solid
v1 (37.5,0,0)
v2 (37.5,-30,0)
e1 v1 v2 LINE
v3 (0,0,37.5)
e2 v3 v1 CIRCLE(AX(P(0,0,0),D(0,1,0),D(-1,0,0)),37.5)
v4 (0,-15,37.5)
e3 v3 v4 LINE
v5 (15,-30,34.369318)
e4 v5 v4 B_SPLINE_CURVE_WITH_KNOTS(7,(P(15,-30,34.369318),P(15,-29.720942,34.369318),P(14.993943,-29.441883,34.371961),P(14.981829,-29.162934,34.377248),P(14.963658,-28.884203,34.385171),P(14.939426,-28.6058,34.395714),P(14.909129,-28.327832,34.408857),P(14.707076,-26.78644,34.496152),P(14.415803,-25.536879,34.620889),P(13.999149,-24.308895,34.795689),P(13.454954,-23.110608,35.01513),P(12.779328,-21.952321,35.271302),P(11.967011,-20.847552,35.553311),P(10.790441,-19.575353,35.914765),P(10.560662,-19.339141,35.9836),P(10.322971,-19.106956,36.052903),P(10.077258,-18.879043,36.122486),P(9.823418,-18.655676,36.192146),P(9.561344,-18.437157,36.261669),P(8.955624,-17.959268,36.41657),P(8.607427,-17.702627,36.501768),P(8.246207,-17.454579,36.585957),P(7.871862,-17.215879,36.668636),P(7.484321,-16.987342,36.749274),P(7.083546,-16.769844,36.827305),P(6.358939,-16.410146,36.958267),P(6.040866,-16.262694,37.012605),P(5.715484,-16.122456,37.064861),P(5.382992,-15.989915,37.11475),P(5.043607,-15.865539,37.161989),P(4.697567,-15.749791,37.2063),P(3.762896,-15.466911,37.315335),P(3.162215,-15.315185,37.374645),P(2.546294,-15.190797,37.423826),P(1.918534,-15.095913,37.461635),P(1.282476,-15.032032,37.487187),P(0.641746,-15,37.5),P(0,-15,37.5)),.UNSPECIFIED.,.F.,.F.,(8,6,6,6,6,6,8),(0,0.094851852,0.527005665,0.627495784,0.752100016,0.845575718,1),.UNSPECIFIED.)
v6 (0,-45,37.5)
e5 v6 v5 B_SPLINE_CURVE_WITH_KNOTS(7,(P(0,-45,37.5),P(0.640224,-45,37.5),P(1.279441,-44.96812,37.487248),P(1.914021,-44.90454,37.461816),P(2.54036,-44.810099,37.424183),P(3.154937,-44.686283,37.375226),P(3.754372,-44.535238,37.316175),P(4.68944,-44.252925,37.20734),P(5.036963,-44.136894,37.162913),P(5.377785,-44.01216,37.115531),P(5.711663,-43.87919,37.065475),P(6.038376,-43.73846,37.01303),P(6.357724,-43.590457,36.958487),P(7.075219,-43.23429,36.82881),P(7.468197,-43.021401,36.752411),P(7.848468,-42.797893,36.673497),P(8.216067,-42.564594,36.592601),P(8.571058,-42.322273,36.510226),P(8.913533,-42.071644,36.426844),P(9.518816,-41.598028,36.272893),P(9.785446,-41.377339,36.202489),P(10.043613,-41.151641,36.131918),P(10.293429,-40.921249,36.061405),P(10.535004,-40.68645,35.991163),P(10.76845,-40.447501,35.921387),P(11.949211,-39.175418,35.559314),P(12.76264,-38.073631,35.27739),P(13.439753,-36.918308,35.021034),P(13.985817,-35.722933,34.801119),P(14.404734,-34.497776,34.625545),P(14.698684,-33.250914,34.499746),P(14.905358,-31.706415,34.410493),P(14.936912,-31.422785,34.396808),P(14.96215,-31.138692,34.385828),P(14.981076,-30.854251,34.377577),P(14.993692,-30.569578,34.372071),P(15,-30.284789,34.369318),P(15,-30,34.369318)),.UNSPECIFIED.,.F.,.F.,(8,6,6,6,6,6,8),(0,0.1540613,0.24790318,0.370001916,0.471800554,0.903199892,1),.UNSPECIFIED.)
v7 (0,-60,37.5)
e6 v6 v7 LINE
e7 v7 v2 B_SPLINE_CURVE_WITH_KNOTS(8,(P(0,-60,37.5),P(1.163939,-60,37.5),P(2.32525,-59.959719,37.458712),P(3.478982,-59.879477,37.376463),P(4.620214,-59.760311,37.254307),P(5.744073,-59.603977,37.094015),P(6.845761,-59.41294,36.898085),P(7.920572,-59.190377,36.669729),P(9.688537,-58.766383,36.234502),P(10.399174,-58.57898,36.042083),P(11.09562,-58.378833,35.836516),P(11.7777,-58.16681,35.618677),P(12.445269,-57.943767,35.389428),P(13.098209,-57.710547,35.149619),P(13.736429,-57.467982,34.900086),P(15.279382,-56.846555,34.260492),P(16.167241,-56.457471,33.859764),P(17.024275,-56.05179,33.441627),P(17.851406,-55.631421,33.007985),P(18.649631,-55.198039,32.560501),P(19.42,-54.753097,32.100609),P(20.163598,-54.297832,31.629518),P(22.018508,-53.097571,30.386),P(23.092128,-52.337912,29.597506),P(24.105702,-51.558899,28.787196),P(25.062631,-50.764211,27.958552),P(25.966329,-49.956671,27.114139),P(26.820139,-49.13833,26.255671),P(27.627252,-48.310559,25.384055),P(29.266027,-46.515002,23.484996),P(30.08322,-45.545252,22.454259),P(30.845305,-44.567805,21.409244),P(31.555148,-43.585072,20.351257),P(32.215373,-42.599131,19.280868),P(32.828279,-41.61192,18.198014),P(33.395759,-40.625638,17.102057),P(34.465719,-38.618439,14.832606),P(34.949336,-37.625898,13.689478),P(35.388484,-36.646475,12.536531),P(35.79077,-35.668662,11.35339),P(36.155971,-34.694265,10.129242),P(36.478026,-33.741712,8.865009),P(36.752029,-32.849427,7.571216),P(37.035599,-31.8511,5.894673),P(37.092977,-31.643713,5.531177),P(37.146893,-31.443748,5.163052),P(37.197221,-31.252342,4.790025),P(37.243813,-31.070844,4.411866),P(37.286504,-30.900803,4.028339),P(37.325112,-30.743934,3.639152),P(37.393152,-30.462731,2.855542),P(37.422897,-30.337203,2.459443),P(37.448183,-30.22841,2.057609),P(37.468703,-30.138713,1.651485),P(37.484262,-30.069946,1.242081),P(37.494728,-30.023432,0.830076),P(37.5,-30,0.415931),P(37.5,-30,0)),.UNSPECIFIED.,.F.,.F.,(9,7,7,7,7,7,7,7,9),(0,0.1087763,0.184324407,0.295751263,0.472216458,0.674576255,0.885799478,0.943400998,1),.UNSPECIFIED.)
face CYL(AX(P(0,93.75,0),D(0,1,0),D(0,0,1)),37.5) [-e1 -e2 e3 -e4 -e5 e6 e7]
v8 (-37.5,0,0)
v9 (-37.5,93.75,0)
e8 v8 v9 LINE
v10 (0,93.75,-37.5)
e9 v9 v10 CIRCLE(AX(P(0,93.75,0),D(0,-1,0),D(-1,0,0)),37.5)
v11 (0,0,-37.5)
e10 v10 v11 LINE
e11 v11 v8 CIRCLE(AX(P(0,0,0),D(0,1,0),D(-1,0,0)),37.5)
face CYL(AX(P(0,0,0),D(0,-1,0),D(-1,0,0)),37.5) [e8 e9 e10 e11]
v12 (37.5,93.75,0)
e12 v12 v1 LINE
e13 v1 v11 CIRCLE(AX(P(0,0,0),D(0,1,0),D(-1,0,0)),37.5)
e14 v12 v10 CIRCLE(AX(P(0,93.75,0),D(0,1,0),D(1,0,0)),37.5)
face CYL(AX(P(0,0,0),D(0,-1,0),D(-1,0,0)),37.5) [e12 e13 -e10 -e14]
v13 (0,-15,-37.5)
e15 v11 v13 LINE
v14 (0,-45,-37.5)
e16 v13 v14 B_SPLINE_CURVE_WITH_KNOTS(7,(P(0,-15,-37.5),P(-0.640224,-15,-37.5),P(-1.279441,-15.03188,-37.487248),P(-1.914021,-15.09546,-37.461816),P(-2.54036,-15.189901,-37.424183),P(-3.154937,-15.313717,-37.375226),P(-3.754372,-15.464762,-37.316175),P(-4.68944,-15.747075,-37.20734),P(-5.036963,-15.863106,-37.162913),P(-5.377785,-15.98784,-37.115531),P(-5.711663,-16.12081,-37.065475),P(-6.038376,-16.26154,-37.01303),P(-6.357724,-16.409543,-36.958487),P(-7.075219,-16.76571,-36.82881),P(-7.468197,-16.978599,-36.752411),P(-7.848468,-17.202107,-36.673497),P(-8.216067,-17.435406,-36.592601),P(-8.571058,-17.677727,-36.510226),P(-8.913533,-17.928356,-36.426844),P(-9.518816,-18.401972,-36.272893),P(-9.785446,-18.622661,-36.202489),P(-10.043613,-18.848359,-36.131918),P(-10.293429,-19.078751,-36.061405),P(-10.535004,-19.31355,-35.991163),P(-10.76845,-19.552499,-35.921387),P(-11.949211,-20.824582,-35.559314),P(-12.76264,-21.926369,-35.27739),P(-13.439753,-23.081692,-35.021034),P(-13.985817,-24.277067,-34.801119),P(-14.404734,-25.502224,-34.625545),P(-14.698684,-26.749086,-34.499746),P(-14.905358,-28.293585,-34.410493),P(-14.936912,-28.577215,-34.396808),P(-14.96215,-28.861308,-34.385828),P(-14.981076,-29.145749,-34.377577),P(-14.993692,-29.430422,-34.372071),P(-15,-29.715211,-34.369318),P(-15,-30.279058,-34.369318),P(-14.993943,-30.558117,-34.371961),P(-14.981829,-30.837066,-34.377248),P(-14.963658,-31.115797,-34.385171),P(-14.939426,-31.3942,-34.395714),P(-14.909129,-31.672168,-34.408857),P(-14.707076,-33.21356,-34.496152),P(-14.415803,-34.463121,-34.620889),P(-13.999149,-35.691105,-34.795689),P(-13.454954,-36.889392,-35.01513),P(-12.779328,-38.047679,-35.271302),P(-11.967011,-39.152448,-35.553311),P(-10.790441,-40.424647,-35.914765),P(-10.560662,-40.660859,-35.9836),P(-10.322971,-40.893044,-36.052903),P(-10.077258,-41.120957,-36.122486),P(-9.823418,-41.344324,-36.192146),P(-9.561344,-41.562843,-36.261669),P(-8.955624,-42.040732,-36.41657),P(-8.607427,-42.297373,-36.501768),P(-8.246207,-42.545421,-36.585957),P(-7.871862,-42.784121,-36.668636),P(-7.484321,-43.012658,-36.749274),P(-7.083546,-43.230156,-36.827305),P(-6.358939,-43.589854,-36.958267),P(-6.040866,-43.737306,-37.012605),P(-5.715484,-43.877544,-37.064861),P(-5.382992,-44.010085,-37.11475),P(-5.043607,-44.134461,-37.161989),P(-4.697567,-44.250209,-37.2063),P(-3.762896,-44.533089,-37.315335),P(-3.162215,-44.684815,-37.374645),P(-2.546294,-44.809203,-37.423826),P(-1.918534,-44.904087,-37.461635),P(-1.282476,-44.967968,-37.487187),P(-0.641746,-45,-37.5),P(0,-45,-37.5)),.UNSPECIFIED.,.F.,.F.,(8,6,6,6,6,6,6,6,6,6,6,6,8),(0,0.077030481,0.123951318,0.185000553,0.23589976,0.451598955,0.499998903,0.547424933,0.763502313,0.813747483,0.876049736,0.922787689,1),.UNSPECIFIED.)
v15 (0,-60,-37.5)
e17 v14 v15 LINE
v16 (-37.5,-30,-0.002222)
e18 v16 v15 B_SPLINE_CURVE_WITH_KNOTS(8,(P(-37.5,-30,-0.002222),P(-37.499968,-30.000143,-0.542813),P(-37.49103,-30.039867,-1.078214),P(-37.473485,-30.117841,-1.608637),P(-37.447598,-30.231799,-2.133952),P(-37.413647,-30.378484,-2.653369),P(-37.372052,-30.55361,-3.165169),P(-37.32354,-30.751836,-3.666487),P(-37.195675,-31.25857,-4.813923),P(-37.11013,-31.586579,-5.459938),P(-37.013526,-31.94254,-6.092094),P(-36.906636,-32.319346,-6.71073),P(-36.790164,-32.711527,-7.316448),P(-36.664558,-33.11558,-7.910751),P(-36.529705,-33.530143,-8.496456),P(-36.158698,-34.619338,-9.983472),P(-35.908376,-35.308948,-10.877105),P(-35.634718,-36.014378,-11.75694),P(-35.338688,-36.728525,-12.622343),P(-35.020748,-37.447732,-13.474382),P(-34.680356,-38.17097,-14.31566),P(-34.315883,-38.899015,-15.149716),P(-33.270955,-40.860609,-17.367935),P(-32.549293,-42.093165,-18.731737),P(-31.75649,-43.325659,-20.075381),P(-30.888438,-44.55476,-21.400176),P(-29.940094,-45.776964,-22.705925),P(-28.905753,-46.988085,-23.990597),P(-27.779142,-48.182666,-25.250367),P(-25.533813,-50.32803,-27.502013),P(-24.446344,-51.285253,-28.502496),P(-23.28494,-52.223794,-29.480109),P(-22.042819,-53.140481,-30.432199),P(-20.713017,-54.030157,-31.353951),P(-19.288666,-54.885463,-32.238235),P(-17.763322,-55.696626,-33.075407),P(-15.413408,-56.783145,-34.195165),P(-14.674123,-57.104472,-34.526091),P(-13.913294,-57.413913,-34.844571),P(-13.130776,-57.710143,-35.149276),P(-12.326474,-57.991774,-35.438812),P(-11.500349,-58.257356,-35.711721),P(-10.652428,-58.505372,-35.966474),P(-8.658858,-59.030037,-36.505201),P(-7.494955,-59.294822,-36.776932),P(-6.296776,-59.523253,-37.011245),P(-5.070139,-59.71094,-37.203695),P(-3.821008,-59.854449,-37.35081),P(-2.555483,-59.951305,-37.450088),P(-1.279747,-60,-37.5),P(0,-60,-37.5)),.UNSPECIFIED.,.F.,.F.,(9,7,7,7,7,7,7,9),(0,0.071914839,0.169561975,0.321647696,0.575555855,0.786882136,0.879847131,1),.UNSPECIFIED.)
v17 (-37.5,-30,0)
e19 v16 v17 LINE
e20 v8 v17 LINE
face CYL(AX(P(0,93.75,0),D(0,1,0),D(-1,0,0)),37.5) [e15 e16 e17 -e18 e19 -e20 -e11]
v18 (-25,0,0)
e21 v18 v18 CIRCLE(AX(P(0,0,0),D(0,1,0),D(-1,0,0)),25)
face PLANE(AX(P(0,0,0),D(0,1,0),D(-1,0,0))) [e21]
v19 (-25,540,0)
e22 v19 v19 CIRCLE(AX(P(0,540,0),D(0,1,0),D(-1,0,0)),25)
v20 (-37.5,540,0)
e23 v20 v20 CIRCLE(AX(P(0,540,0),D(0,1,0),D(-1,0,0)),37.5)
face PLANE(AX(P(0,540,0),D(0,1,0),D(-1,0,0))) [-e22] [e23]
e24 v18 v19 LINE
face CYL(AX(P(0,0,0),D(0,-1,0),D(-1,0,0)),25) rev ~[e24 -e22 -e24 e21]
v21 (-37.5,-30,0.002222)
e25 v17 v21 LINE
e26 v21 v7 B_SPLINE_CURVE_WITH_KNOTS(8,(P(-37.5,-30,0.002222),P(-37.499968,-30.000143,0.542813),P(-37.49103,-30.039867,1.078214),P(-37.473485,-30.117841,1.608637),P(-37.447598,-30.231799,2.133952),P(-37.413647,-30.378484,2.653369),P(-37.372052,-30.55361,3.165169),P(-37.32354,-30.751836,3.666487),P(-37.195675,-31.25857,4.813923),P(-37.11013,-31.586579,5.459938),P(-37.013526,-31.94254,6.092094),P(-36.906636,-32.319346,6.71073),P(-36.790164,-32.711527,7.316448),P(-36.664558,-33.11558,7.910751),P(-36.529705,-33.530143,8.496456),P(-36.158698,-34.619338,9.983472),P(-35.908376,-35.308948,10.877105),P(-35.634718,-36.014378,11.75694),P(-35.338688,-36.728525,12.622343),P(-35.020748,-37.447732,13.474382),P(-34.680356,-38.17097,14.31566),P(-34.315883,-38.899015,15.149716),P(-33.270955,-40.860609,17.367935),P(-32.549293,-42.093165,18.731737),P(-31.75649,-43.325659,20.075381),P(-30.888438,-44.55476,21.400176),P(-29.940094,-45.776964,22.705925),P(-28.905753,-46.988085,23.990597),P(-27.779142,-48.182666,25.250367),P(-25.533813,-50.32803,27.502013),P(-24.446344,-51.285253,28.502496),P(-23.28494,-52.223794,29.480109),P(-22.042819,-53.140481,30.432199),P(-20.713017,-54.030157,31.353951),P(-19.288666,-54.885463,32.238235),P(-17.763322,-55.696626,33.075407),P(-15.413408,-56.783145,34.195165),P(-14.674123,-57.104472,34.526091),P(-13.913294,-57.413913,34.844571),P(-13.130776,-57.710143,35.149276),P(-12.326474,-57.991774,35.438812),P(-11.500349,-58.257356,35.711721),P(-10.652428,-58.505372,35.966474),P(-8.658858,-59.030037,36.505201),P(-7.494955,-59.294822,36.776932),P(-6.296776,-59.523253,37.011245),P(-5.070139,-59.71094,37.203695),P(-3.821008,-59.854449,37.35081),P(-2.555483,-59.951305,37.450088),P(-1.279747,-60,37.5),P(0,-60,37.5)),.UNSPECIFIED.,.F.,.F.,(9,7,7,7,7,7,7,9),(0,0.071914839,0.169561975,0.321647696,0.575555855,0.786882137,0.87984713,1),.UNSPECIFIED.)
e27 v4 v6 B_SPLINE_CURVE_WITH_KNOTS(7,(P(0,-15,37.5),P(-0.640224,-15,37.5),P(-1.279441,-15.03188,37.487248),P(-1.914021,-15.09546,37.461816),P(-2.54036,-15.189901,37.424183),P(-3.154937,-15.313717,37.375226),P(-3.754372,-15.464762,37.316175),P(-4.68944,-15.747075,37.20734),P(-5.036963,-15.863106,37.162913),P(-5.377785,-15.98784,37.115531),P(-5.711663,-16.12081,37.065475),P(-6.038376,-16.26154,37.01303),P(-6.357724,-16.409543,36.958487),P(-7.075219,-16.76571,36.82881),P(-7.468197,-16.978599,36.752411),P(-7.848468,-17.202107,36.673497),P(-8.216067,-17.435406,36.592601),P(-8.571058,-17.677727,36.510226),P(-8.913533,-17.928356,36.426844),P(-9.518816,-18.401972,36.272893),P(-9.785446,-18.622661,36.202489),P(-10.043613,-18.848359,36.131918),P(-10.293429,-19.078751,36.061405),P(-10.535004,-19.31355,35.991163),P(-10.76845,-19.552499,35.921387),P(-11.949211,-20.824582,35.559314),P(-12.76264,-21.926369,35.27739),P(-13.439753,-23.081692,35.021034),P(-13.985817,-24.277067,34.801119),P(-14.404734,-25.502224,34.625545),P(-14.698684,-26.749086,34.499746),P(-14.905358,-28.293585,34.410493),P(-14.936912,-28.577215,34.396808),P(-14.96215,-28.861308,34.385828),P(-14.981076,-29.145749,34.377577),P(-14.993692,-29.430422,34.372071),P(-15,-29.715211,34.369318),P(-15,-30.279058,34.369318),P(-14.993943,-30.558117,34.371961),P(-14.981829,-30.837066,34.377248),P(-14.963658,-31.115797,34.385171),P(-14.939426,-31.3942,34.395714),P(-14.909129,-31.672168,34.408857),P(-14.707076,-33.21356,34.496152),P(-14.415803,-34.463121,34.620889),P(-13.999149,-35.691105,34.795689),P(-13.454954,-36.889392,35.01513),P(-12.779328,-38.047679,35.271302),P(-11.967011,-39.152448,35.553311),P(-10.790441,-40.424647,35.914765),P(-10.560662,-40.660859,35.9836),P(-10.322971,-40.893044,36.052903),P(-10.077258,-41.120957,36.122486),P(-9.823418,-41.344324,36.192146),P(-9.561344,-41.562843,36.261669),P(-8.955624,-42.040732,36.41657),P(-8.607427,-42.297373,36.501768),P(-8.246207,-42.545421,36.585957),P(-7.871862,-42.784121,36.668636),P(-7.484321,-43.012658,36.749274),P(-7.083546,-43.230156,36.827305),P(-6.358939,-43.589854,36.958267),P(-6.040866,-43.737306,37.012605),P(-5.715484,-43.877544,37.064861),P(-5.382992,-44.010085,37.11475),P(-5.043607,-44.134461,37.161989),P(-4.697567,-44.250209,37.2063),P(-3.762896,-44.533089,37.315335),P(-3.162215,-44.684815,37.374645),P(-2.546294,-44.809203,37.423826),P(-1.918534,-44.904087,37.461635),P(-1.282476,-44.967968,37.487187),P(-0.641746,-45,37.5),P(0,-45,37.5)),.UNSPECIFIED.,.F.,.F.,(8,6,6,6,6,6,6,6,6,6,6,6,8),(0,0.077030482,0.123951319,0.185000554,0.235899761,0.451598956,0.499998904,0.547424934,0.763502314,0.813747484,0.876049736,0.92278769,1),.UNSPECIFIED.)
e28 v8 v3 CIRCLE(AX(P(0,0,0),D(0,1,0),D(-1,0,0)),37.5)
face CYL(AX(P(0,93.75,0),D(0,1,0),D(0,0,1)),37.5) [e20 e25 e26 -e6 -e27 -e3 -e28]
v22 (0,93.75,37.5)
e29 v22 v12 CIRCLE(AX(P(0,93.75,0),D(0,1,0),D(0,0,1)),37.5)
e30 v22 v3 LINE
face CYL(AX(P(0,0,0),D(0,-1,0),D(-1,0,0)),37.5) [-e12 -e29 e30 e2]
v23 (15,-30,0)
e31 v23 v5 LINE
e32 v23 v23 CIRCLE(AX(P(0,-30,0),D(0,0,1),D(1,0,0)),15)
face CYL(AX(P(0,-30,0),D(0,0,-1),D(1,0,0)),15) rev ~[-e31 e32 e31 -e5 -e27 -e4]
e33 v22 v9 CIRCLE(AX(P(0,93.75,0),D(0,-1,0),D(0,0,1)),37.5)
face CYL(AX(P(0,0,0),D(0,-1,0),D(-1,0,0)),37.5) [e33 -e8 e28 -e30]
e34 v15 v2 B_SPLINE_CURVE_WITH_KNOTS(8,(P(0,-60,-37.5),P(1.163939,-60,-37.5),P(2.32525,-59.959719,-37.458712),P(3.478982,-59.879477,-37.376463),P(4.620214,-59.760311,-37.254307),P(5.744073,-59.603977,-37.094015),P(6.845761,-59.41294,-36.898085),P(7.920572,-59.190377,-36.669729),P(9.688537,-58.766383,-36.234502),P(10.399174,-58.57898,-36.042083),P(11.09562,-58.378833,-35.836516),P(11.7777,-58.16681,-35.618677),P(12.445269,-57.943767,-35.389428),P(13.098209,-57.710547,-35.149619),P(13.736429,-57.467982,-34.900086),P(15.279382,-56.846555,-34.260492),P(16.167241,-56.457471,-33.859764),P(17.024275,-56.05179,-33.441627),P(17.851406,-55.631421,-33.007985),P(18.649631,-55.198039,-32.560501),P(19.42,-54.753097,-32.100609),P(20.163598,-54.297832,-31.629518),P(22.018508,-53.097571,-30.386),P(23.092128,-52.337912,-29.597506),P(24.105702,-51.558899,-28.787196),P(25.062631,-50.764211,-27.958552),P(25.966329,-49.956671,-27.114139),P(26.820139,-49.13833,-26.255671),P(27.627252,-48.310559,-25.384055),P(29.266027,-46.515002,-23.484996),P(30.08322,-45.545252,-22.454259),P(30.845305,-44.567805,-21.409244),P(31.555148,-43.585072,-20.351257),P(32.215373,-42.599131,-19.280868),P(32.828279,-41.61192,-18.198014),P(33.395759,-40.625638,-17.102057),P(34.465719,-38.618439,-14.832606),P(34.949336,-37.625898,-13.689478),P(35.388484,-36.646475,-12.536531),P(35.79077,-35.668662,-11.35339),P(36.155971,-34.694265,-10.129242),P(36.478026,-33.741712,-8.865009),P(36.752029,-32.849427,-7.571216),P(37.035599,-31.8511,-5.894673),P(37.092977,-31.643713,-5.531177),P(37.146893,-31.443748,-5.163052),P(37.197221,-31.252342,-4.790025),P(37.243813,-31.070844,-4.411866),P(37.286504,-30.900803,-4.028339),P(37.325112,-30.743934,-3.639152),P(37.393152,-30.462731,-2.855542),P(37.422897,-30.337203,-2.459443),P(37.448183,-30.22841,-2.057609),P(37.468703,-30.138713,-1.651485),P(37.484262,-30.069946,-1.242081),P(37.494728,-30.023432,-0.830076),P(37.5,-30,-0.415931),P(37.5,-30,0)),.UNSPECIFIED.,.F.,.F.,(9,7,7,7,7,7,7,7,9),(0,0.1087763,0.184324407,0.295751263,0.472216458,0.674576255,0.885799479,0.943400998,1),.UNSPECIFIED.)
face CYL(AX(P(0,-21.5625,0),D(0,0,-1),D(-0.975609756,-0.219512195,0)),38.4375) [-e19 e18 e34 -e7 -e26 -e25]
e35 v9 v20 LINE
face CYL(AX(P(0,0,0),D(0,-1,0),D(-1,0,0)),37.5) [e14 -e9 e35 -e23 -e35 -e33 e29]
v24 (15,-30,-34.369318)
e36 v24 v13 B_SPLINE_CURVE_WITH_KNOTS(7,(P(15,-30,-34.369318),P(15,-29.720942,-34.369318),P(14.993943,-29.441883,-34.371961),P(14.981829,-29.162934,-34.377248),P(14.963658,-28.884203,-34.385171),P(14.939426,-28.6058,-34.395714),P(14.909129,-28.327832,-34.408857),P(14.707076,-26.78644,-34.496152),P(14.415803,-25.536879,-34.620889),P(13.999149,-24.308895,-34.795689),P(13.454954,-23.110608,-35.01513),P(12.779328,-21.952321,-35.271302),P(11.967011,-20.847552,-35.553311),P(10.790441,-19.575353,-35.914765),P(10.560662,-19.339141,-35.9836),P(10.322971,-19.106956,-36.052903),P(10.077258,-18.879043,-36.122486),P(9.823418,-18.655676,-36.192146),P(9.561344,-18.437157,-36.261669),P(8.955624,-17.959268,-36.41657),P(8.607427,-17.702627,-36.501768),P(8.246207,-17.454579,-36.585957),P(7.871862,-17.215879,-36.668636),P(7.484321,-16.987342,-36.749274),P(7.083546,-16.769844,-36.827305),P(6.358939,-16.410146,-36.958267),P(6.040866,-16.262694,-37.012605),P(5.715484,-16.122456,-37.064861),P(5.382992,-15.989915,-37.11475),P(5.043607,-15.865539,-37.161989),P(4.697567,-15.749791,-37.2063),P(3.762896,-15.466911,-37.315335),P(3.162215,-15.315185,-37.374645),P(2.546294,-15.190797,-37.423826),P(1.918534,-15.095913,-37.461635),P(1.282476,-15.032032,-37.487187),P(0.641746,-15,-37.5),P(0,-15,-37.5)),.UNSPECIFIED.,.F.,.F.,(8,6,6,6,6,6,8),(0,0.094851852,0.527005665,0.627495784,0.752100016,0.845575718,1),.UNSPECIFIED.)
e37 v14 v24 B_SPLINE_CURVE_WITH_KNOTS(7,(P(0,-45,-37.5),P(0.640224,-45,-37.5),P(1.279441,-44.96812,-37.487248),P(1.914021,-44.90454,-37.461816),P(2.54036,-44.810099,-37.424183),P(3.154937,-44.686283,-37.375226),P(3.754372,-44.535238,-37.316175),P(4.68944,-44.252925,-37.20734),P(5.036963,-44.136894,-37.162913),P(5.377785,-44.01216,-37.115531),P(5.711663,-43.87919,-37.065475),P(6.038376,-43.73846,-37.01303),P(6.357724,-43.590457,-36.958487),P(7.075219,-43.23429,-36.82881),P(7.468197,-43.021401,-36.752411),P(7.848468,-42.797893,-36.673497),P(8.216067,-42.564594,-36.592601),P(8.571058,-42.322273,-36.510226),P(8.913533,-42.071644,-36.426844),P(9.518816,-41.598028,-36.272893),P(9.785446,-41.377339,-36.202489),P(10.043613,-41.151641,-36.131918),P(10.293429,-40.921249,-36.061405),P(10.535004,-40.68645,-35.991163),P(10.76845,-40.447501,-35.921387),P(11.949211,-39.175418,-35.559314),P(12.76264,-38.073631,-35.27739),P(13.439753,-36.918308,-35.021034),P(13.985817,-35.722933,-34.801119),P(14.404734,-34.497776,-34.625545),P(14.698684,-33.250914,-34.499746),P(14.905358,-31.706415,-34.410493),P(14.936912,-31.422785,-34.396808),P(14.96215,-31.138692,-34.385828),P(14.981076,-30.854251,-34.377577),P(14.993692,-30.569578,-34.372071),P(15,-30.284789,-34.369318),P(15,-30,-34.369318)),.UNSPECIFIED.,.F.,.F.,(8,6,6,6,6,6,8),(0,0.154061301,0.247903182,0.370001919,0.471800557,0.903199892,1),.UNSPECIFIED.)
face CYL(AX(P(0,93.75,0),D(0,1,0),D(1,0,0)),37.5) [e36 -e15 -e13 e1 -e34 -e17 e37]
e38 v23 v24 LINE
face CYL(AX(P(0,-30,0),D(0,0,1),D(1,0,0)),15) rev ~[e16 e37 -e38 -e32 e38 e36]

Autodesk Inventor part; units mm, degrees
sketch "Sketch1" plane through (0, 0, 0) normal (0, 1, 0) x (-1, 0, 0)
  circle A0 centre (0, 0) radius 37.5
  circle A1 centre (0, 0) radius 25
  dimension "d0" = 75
  dimension "d1" = 50
extrude "Extrusion1" add sketch "Sketch1" along normal blind 540
sketch "Sketch2" plane through (0, 0, 0) normal (0, 1, 0) x (-1, 0, 0)
  line L0 (-37.5, -37.5) -> (37.5, -37.5)
  line L1 (37.5, -37.5) -> (37.5, 37.5)
  line L2 (37.5, 37.5) -> (-37.5, 37.5)
  line L3 (-37.5, 37.5) -> (-37.5, -37.5)
  point P0 (0, 0)
extrude "Extrusion2" add sketch "Sketch2" against normal blind 60
sketch "Sketch3" plane through (0, 0, 0) normal (0, 0, 1) x (1, 0, 0)
  circle A0 centre (0, -30) radius 15
  line L0 (-52.5, 0) -> (52.5, 0) projected
  line L1 (-37.5, 0) -> (-37.5, -60) projected
  line L2 (37.5, 0) -> (37.5, -60) projected
  arc A1 (-37.5, -30) -> (37.5, -30) centre (0, -21.5625) ccw
  line L3 (-37.5, -30) -> (-52.5, -30)
  line L4 (-52.5, -30) -> (-52.5, -80.2965)
  line L5 (-52.5, -80.2965) -> (57.4115, -80.2965)
  line L6 (57.4115, -80.2965) -> (57.4115, -30)
  line L7 (57.4115, -30) -> (37.5, -30)
  point P0 (0, 0)
  dimension "d6" = 30
  dimension "d7" = 30
extrude "Extrusion3" cut sketch "Sketch3" along normal mid plane 150 contours A0 | A1 L7 L6 L5 L4 L3
fillet "Fillet1" radius 37.5 4 edges at (37.5, -15, 37.5) (37.5, -15, -37.5) (-37.5, -15, 37.5) (-37.5, -15, -37.5)
properties part number "Cylinder_Bom"
